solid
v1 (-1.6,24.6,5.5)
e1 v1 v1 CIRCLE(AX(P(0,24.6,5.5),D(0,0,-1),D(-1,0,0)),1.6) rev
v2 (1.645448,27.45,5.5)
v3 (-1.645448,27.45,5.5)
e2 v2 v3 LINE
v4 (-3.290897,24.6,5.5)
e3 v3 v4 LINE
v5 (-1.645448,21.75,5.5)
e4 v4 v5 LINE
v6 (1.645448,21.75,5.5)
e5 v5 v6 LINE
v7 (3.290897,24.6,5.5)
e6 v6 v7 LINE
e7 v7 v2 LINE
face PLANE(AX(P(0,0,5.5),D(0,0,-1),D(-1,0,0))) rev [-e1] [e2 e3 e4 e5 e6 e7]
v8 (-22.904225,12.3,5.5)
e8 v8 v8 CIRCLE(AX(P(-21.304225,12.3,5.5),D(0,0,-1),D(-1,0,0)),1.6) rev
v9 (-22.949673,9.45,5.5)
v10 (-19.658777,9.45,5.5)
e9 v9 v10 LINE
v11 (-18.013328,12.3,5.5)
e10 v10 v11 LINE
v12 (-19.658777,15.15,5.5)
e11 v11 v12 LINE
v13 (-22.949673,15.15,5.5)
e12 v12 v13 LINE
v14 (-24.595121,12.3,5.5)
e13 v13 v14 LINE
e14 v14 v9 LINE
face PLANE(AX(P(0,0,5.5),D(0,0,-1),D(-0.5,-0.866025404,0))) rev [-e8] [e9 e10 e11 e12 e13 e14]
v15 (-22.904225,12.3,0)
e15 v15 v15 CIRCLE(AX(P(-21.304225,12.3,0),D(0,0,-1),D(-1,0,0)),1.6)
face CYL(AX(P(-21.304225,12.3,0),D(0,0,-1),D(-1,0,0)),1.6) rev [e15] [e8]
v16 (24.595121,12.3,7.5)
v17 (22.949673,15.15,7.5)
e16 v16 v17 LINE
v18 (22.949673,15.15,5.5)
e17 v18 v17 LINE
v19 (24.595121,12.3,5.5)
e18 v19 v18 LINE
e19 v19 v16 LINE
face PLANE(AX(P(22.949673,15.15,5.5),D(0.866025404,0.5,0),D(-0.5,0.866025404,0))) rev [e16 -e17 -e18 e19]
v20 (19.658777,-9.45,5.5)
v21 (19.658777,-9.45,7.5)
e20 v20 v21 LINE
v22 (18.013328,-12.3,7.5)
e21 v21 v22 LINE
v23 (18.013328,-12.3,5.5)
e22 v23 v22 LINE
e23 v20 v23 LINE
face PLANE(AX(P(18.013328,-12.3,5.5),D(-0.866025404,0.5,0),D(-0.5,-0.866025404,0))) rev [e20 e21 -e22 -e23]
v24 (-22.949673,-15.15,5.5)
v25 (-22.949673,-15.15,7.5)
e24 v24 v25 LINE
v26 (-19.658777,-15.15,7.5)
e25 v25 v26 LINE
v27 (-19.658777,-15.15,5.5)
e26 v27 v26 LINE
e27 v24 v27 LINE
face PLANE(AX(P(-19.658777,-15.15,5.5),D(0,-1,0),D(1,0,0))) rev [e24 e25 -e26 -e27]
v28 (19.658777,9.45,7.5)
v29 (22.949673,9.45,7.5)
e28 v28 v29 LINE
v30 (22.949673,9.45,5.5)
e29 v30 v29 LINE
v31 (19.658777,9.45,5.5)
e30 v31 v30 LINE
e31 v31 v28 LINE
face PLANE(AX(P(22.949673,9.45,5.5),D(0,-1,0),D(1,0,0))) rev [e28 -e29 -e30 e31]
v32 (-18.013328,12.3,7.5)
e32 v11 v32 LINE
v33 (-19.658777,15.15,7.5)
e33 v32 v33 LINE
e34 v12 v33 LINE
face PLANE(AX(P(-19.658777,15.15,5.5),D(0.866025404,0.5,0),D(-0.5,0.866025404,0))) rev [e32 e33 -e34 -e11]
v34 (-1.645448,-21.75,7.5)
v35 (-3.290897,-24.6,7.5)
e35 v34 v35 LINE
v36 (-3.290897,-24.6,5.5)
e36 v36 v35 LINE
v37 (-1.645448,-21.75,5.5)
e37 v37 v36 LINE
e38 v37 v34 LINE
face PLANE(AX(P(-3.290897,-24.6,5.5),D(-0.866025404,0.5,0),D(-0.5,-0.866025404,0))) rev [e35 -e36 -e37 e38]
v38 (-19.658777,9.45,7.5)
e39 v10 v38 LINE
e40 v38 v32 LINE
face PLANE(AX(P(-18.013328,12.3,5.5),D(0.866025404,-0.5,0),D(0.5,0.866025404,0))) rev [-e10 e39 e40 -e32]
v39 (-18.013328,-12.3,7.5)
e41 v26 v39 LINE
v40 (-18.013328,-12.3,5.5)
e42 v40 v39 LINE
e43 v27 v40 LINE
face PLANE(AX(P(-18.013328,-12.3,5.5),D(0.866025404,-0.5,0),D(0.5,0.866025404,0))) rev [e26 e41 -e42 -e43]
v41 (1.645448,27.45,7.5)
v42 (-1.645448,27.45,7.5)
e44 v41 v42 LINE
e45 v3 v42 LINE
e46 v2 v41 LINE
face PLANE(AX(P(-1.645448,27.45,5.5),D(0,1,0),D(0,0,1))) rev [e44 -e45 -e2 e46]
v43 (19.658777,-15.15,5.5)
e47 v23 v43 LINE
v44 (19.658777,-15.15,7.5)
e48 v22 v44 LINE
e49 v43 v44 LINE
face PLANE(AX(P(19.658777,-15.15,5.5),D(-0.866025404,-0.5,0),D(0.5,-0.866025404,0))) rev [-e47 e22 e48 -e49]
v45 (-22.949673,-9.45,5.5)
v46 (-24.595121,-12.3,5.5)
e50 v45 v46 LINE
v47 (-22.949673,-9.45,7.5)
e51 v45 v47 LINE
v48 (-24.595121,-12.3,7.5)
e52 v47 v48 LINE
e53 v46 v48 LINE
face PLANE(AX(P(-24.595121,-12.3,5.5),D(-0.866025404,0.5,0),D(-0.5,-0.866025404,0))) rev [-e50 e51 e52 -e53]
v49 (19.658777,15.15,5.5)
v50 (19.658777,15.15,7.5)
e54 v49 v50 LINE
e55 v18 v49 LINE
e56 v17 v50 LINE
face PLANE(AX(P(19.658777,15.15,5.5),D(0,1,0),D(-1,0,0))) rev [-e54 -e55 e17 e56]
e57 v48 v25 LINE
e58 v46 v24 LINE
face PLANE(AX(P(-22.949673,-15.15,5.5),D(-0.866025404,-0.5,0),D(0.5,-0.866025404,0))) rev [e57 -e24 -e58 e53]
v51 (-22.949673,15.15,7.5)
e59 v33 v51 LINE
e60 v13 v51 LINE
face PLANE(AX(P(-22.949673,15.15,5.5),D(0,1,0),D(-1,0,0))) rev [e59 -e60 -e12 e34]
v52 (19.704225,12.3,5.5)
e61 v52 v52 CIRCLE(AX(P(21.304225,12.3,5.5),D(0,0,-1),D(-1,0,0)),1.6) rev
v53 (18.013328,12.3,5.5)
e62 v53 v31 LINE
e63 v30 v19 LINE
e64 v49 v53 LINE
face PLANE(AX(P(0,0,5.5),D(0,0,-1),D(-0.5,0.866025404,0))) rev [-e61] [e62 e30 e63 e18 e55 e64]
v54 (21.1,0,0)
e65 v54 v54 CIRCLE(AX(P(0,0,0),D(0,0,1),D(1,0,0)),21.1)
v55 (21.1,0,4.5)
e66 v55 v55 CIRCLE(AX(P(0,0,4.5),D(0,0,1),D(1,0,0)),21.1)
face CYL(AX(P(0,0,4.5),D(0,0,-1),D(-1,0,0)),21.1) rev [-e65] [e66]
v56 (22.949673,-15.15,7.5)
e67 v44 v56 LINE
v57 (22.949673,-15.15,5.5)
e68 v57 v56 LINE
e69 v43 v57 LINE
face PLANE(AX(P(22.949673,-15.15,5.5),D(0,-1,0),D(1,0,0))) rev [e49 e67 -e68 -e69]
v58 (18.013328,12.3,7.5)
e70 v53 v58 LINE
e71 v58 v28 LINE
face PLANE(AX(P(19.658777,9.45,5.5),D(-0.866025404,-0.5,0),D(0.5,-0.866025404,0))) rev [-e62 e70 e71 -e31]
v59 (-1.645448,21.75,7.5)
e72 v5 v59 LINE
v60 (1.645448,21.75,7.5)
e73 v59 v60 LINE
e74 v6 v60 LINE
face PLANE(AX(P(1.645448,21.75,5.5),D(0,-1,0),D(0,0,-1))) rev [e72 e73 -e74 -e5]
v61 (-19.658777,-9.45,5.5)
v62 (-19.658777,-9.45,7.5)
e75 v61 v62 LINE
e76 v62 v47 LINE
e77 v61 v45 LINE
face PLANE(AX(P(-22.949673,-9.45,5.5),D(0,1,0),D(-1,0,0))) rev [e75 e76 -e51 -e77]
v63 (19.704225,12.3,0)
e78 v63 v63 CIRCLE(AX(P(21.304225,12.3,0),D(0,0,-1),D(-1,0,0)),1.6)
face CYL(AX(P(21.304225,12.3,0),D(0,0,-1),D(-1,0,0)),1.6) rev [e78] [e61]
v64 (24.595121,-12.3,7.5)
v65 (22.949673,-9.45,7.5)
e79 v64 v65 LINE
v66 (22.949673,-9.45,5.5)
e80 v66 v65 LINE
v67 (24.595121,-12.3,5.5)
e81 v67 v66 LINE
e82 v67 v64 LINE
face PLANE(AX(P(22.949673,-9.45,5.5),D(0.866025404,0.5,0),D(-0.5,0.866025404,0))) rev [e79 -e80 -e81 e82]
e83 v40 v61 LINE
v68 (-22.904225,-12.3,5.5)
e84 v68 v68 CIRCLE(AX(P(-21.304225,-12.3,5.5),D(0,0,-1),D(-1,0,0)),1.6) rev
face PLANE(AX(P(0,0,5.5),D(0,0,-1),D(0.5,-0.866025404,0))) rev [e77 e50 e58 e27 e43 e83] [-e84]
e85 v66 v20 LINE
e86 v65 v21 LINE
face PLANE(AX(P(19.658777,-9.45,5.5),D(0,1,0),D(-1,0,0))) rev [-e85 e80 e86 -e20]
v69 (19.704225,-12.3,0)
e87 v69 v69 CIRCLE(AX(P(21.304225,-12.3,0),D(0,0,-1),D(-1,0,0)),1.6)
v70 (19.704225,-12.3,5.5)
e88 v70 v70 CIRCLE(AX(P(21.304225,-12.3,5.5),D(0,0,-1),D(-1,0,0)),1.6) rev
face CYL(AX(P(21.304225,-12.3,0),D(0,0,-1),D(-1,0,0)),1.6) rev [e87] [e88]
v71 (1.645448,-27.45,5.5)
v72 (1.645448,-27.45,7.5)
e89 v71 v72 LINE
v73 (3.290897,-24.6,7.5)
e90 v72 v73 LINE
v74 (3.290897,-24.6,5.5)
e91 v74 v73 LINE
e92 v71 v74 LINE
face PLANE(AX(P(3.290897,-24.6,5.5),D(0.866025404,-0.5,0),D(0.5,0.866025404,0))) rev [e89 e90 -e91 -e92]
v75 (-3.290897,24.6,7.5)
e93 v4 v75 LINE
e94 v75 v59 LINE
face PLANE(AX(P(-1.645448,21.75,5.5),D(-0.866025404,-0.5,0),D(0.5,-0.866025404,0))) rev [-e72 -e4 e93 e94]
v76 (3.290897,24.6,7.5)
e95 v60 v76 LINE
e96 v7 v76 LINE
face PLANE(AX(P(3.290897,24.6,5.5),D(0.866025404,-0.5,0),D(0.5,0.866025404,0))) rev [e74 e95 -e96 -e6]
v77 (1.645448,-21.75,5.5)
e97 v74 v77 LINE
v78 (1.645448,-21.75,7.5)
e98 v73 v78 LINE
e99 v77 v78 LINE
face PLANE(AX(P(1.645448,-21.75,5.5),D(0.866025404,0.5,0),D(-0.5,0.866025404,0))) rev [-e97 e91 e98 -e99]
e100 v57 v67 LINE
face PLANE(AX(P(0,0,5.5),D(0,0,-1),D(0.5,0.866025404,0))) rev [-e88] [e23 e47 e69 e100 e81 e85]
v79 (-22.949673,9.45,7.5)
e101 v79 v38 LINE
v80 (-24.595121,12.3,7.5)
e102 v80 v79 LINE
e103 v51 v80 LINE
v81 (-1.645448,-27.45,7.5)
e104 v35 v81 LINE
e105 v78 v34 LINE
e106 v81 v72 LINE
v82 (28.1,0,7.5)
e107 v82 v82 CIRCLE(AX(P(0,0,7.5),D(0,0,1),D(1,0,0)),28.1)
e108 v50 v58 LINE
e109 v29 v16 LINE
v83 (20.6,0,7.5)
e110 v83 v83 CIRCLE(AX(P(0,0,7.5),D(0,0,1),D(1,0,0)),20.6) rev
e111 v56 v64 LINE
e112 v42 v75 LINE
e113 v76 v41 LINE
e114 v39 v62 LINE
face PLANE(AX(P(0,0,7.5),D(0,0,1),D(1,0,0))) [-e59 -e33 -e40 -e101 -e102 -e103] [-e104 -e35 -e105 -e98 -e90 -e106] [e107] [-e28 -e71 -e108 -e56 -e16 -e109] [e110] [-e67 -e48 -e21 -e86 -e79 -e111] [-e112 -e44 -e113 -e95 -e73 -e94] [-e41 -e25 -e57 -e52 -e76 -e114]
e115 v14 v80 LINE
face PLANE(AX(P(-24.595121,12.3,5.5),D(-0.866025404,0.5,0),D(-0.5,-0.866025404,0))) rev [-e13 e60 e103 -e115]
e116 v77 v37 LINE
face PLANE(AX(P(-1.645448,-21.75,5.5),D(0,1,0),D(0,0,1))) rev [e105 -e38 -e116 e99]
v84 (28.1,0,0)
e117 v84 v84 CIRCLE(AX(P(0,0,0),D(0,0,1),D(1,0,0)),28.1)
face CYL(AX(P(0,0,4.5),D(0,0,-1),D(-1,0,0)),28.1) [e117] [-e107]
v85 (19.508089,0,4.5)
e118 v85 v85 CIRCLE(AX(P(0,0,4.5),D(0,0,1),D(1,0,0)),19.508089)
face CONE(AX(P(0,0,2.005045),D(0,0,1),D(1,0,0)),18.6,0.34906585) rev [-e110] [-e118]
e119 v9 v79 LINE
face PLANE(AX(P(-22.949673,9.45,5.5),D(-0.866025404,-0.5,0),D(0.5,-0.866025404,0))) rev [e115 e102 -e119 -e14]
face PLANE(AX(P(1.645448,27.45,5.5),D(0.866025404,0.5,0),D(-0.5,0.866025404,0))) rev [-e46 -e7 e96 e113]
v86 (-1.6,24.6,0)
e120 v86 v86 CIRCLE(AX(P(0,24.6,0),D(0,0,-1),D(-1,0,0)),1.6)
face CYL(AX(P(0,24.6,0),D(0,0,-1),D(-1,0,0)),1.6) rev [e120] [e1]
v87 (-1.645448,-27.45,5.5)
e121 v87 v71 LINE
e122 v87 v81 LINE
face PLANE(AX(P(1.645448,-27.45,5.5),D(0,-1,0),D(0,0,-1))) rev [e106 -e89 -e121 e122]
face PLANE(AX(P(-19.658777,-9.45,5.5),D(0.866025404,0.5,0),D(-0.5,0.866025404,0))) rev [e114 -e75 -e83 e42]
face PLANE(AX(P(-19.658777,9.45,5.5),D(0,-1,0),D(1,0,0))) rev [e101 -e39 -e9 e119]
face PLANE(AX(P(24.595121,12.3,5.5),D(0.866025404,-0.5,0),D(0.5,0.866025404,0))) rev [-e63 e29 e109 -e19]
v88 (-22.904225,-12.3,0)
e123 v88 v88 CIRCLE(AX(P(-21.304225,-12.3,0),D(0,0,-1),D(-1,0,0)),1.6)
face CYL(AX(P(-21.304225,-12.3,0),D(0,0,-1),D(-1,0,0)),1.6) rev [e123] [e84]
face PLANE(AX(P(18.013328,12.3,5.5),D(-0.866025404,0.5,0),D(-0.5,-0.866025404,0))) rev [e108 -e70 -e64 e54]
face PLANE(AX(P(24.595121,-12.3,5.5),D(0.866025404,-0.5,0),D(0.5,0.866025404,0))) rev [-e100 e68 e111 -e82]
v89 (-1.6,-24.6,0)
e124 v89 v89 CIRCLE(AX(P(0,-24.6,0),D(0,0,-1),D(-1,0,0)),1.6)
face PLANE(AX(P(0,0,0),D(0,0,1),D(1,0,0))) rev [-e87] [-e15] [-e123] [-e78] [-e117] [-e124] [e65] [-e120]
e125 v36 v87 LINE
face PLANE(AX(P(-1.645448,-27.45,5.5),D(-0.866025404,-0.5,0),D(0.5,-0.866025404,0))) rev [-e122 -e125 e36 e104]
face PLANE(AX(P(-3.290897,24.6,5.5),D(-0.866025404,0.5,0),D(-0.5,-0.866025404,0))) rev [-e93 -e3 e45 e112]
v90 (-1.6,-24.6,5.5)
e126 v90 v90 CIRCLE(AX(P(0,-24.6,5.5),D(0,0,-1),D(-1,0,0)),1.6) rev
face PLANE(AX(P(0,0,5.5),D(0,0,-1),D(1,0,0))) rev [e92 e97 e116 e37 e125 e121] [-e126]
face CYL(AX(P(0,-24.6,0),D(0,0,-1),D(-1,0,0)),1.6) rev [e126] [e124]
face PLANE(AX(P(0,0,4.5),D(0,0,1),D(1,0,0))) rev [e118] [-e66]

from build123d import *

# Parameters (mm, degrees)
SKETCH1_R            = 28.1
SKETCH1_R_2          = 21.1
BOSS_EXTRUDE1_DEPTH  = 4.5
SKETCH2_R            = 28.1
SKETCH2_R_2          = 18.6
BOSS_EXTRUDE2_DEPTH  = 3
M3_CLEARANCE_HOLE1_D = 3.2
CUT_EXTRUDE1_DEPTH   = 2
CIRPATTERN1_COUNT    = 6
CHAMFER1_SIZE        = 2
CHAMFER1_SIZE_2      = 5.494954839


with BuildPart() as part:
    # Sketch1 → Boss-Extrude1 (new body)
    with BuildSketch(Plane.XY):
        Circle(SKETCH1_R)
        Circle(SKETCH1_R_2, mode=Mode.SUBTRACT)
    extrude(amount=BOSS_EXTRUDE1_DEPTH)

    # Sketch2 → Boss-Extrude2 (add)
    with BuildSketch(Plane.XY.offset(4.5)):
        Circle(SKETCH2_R)
        Circle(SKETCH2_R_2, mode=Mode.SUBTRACT)
    extrude(amount=BOSS_EXTRUDE2_DEPTH)

    # M3 Clearance Hole1 (through all)
    with Locations(Plane(origin=(0, 0, 0), x_dir=(-1, 0, 0), z_dir=(0, 0, -1))):
        with Locations((0, 24.6)):
            m3_clearance_hole1 = Hole(M3_CLEARANCE_HOLE1_D / 2)

    # Sketch5 → Cut-Extrude1 (cut)
    with BuildSketch(Plane.XY.offset(7.5)):
        Polygon((-1.645448267, 27.45), (1.645448267, 27.45), (3.290896534, 24.6), (1.645448267, 21.75), (-1.645448267, 21.75), (-3.290896534, 24.6), align=None)
    cut_extrude1 = extrude(amount=-CUT_EXTRUDE1_DEPTH, mode=Mode.SUBTRACT)

    # CirPattern1: M3 Clearance Hole1, Cut-Extrude1 ×6 about axis
    cirpattern1_axis = Axis((0, 0, 0), (0, 0, 1))
    add([m3_clearance_hole1.rotate(cirpattern1_axis, i * 360 / CIRPATTERN1_COUNT) for i in range(1, CIRPATTERN1_COUNT)], mode=Mode.SUBTRACT)
    add([cut_extrude1.rotate(cirpattern1_axis, i * 360 / CIRPATTERN1_COUNT) for i in range(1, CIRPATTERN1_COUNT)], mode=Mode.SUBTRACT)

    # Chamfer1
    # the kernel refuses this chamfer: 5.494954839, 2 mm, written as the material it takes off along each edge
    with BuildSketch(Plane(origin=(0, 0, 7.5), x_dir=(1, 0, 0), z_dir=(0, -1, 0))) as chamfer1_piece_1:
        Polygon((18.6 + CHAMFER1_SIZE, 0), (18.6, -CHAMFER1_SIZE_2), (18.6, 0), align=None)
    revolve(axis=Axis((0, 0, 7.5), (0, 0, 1)), mode=Mode.SUBTRACT)


solid = part.part
